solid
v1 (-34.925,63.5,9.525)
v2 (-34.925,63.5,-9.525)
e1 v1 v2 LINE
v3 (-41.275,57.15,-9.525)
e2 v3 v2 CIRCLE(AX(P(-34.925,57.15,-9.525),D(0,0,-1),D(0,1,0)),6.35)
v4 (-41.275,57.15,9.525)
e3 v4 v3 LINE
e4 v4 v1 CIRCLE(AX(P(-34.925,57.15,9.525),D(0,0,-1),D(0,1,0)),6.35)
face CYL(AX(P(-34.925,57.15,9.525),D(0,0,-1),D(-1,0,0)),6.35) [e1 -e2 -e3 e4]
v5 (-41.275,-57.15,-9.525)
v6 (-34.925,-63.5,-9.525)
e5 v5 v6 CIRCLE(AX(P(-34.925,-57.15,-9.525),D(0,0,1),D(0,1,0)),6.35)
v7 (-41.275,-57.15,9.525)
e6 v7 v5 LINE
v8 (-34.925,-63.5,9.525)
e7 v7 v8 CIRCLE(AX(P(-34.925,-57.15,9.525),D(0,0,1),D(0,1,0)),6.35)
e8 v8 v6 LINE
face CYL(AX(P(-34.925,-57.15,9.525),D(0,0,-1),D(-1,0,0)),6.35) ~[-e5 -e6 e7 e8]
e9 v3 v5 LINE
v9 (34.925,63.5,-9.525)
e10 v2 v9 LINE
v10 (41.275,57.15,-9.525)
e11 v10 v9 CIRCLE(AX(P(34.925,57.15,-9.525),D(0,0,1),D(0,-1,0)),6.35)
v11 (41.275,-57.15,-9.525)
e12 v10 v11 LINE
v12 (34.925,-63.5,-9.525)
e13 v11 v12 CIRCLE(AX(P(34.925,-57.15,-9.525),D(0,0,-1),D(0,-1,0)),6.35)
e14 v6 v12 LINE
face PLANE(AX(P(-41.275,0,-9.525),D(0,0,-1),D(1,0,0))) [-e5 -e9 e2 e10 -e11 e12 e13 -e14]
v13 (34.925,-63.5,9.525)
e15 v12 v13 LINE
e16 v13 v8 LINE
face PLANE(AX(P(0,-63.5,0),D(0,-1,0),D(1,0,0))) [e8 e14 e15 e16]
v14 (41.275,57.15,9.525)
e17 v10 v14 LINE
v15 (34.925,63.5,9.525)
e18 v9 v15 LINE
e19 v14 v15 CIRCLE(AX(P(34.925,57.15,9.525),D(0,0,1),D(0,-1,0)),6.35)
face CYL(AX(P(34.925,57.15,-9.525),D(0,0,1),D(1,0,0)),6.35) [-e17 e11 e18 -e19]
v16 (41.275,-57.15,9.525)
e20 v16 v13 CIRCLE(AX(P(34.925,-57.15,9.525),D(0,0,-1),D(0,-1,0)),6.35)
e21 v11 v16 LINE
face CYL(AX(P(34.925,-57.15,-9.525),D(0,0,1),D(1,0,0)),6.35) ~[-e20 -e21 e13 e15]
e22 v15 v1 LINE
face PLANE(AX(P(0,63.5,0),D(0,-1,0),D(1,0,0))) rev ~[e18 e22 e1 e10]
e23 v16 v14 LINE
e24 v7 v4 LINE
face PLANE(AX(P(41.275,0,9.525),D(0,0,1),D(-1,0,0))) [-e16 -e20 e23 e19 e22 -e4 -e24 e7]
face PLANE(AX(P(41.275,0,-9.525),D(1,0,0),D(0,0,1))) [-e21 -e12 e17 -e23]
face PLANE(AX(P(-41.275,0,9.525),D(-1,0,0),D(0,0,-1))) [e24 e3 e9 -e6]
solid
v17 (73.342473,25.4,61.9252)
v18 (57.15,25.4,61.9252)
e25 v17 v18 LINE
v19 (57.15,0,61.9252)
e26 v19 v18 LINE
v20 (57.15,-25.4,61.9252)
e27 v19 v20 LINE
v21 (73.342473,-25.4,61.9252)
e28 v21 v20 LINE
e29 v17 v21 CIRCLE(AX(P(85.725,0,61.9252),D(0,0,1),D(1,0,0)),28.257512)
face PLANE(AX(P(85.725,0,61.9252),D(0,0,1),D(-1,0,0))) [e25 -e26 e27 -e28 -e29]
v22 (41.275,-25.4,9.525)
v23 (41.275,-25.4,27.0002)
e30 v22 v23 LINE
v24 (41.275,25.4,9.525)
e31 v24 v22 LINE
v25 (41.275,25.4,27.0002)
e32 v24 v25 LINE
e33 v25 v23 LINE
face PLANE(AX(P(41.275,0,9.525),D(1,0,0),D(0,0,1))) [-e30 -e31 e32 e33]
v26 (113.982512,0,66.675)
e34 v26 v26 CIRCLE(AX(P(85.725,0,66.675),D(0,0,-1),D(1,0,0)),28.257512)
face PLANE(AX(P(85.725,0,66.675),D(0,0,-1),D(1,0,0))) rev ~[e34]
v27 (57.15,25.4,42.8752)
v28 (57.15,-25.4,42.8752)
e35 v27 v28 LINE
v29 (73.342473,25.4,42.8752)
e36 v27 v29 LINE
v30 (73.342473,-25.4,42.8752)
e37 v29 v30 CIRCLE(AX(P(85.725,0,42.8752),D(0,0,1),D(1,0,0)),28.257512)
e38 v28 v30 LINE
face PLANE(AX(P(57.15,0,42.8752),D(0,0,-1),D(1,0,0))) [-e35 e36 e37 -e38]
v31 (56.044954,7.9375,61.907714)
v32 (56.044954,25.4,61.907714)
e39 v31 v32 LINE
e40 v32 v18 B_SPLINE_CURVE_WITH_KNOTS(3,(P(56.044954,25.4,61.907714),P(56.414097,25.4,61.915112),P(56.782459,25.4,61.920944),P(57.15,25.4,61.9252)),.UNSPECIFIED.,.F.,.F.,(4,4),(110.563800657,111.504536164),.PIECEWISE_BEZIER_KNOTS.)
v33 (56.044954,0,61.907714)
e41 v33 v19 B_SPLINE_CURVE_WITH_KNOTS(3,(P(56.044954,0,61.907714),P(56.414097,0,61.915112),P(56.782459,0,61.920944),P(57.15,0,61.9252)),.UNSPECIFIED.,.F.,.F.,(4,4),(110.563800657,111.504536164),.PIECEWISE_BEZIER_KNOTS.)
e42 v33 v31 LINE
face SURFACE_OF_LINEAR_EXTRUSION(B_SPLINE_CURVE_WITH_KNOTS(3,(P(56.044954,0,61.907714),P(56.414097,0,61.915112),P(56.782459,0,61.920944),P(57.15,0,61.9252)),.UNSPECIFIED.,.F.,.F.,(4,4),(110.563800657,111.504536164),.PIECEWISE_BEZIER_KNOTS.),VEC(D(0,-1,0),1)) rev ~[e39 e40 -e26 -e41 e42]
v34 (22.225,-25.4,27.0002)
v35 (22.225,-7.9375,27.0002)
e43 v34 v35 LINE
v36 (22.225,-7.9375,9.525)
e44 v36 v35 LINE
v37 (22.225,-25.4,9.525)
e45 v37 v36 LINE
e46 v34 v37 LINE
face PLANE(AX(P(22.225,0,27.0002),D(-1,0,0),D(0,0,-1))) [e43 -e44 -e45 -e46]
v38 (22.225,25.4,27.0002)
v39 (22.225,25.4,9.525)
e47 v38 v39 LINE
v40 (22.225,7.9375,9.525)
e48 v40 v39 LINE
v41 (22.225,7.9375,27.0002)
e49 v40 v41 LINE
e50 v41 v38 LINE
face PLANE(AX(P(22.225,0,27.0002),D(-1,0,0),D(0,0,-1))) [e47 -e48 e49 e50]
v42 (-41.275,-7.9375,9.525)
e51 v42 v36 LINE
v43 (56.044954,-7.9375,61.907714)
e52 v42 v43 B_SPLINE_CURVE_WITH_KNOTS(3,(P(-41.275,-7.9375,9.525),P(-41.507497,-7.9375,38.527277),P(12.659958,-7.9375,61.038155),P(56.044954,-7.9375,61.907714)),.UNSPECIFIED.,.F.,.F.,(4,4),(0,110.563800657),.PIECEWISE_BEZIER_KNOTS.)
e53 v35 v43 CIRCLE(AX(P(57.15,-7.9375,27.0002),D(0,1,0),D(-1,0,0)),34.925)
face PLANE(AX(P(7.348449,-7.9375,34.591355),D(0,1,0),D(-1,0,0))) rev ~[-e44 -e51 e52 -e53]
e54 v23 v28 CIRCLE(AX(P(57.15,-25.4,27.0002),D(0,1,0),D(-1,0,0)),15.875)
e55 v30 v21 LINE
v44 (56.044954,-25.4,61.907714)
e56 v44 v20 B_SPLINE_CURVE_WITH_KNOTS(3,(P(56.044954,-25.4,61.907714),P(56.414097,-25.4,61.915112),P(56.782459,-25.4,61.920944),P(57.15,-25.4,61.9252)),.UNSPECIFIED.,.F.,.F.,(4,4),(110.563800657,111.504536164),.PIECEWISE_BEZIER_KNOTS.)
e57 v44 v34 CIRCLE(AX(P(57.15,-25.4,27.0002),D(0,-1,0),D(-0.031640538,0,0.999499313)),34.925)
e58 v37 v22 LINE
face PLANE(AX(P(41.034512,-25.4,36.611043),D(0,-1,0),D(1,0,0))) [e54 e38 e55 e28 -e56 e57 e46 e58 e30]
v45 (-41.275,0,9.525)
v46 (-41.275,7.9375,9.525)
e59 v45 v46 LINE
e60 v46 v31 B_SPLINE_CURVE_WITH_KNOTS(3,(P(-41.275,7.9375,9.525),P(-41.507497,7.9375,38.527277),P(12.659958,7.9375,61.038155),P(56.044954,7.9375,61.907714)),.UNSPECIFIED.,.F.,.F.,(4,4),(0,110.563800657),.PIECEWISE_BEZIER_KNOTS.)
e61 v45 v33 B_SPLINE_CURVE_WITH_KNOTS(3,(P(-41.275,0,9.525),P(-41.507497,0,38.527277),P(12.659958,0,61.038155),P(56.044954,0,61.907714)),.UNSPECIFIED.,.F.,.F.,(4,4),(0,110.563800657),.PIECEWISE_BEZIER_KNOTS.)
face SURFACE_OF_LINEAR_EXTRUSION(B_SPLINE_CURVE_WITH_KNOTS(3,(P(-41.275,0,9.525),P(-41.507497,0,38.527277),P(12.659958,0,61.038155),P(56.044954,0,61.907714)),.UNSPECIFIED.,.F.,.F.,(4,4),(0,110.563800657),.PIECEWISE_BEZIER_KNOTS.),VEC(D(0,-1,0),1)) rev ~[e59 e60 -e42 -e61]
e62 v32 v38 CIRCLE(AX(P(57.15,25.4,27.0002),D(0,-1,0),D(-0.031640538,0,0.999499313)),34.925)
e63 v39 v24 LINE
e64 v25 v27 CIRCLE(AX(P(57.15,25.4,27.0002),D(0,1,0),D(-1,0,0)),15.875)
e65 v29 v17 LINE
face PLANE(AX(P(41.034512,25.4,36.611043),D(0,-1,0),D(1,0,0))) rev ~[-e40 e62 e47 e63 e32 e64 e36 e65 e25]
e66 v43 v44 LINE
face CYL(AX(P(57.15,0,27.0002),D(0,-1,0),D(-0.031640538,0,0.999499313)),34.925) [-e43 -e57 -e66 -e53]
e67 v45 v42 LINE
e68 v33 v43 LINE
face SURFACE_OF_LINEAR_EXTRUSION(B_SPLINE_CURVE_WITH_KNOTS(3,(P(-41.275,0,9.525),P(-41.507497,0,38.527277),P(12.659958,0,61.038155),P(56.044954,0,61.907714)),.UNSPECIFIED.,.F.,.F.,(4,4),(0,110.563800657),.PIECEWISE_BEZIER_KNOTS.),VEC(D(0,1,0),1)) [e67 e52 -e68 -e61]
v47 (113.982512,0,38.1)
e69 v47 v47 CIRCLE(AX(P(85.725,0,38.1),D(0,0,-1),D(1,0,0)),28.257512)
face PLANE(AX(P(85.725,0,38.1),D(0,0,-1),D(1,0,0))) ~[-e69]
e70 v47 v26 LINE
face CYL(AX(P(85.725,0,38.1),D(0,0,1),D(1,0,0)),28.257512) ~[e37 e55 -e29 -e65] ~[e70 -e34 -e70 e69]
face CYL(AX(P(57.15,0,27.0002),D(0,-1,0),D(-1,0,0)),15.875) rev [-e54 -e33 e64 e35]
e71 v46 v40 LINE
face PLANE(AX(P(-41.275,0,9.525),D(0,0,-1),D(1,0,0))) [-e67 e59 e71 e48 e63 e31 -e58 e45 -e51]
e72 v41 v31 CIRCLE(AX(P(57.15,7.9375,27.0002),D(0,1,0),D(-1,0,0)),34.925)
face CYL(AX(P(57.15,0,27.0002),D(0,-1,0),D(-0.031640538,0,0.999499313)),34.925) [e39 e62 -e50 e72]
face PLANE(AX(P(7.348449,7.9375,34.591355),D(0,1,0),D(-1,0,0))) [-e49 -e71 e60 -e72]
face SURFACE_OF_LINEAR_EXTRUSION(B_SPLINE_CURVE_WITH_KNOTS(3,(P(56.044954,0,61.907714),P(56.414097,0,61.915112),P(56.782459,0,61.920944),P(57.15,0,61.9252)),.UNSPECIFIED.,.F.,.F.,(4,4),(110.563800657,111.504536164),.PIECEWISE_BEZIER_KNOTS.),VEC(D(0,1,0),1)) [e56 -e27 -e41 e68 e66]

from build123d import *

# Parameters (mm, degrees)
F1_DEPTH = 63.5
F0_W     = 22.5424882722
F0_H     = 19.05
F2_DEPTH = 25.4
F3_DEPTH = 7.9375
F5_R     = 6.35


with BuildPart() as f1:
    # F0 (on Front) → F1 (new body, symmetric)
    with BuildSketch(Plane.XZ):
        Polygon((-41.275, 9.525), (-41.275, -9.525), (41.275, -9.525), (41.275, 9.525), (22.225, 9.525), align=None)
    extrude(amount=F1_DEPTH, both=True)

    # F5
    f5_edges = [f1.edges().sort_by_distance(p)[0] for p in [
        (41.275, -63.5, 0),
        (-41.275, -63.5, 0),
        (41.275, 63.5, 0),
        (-41.275, 63.5, 0),
    ]]
    fillet(f5_edges, radius=F5_R)


with BuildPart() as f2:
    # F0 (on Front) → F2 (new body, symmetric)
    with BuildSketch(Plane.XZ):
        with BuildLine():
            Line((22.225, 9.525), (41.275, 9.525))
            Line((41.275, 9.525), (41.275, 27.0002))
            ThreePointArc((41.275, 27.0002), (45.9246798487, 38.2255201513), (57.15, 42.8752))
            Line((57.15, 42.8752), (63.1825117278, 42.8752))
            Line((63.1825117278, 42.8752), (63.1825117278, 61.9252))
            Line((63.1825117278, 61.9252), (57.15, 61.9252))
            add(Edge.make_bspline(
                [(56.0449542067, 61.9077135006), (56.4140967853, 61.9151121698), (56.7824587666, 61.9209441136), (57.15, 61.9252)],
                knots=[110.563800657, 110.563800657, 110.563800657, 110.563800657, 111.5045361635, 111.5045361635, 111.5045361635, 111.5045361635], degree=3))
            ThreePointArc((56.0449542067, 61.9077135006), (32.0666454663, 51.302071334), (22.225, 27.0002))
            Line((22.225, 27.0002), (22.225, 9.525))
        make_face()
        with Locations((74.4537558639, 52.4002)):
            Rectangle(F0_W, F0_H)
    extrude(amount=F2_DEPTH, both=True)

    # F0 (on Front) → F3 (join, symmetric)
    with BuildSketch(Plane.XZ):
        with BuildLine():
            add(Edge.make_bspline(
                [(-41.275, 9.525), (-41.5074973481, 38.5272765574), (12.65995791, 61.0381545449), (56.0449542067, 61.9077135006)],
                knots=[0, 0, 0, 0, 110.563800657, 110.563800657, 110.563800657, 110.563800657], degree=3))
            Line((-41.275, 9.525), (22.225, 9.525))
            Line((22.225, 9.525), (22.225, 27.0002))
            ThreePointArc((22.225, 27.0002), (32.0666454663, 51.302071334), (56.0449542067, 61.9077135006))
        make_face()
    extrude(amount=F3_DEPTH, both=True)

    # F0 (on Front) → F4 (revolve)
    with BuildSketch(Plane.XZ):
        Polygon((85.725, 66.675), (85.725, 61.9252), (85.725, 42.8752), (85.725, 38.1), (113.9825117278, 38.1), (113.9825117278, 66.675), align=None)
    revolve(axis=Axis((85.725, 0, 52.3875), (0, 0, -1)))


solid = Compound([f1.part, f2.part])
